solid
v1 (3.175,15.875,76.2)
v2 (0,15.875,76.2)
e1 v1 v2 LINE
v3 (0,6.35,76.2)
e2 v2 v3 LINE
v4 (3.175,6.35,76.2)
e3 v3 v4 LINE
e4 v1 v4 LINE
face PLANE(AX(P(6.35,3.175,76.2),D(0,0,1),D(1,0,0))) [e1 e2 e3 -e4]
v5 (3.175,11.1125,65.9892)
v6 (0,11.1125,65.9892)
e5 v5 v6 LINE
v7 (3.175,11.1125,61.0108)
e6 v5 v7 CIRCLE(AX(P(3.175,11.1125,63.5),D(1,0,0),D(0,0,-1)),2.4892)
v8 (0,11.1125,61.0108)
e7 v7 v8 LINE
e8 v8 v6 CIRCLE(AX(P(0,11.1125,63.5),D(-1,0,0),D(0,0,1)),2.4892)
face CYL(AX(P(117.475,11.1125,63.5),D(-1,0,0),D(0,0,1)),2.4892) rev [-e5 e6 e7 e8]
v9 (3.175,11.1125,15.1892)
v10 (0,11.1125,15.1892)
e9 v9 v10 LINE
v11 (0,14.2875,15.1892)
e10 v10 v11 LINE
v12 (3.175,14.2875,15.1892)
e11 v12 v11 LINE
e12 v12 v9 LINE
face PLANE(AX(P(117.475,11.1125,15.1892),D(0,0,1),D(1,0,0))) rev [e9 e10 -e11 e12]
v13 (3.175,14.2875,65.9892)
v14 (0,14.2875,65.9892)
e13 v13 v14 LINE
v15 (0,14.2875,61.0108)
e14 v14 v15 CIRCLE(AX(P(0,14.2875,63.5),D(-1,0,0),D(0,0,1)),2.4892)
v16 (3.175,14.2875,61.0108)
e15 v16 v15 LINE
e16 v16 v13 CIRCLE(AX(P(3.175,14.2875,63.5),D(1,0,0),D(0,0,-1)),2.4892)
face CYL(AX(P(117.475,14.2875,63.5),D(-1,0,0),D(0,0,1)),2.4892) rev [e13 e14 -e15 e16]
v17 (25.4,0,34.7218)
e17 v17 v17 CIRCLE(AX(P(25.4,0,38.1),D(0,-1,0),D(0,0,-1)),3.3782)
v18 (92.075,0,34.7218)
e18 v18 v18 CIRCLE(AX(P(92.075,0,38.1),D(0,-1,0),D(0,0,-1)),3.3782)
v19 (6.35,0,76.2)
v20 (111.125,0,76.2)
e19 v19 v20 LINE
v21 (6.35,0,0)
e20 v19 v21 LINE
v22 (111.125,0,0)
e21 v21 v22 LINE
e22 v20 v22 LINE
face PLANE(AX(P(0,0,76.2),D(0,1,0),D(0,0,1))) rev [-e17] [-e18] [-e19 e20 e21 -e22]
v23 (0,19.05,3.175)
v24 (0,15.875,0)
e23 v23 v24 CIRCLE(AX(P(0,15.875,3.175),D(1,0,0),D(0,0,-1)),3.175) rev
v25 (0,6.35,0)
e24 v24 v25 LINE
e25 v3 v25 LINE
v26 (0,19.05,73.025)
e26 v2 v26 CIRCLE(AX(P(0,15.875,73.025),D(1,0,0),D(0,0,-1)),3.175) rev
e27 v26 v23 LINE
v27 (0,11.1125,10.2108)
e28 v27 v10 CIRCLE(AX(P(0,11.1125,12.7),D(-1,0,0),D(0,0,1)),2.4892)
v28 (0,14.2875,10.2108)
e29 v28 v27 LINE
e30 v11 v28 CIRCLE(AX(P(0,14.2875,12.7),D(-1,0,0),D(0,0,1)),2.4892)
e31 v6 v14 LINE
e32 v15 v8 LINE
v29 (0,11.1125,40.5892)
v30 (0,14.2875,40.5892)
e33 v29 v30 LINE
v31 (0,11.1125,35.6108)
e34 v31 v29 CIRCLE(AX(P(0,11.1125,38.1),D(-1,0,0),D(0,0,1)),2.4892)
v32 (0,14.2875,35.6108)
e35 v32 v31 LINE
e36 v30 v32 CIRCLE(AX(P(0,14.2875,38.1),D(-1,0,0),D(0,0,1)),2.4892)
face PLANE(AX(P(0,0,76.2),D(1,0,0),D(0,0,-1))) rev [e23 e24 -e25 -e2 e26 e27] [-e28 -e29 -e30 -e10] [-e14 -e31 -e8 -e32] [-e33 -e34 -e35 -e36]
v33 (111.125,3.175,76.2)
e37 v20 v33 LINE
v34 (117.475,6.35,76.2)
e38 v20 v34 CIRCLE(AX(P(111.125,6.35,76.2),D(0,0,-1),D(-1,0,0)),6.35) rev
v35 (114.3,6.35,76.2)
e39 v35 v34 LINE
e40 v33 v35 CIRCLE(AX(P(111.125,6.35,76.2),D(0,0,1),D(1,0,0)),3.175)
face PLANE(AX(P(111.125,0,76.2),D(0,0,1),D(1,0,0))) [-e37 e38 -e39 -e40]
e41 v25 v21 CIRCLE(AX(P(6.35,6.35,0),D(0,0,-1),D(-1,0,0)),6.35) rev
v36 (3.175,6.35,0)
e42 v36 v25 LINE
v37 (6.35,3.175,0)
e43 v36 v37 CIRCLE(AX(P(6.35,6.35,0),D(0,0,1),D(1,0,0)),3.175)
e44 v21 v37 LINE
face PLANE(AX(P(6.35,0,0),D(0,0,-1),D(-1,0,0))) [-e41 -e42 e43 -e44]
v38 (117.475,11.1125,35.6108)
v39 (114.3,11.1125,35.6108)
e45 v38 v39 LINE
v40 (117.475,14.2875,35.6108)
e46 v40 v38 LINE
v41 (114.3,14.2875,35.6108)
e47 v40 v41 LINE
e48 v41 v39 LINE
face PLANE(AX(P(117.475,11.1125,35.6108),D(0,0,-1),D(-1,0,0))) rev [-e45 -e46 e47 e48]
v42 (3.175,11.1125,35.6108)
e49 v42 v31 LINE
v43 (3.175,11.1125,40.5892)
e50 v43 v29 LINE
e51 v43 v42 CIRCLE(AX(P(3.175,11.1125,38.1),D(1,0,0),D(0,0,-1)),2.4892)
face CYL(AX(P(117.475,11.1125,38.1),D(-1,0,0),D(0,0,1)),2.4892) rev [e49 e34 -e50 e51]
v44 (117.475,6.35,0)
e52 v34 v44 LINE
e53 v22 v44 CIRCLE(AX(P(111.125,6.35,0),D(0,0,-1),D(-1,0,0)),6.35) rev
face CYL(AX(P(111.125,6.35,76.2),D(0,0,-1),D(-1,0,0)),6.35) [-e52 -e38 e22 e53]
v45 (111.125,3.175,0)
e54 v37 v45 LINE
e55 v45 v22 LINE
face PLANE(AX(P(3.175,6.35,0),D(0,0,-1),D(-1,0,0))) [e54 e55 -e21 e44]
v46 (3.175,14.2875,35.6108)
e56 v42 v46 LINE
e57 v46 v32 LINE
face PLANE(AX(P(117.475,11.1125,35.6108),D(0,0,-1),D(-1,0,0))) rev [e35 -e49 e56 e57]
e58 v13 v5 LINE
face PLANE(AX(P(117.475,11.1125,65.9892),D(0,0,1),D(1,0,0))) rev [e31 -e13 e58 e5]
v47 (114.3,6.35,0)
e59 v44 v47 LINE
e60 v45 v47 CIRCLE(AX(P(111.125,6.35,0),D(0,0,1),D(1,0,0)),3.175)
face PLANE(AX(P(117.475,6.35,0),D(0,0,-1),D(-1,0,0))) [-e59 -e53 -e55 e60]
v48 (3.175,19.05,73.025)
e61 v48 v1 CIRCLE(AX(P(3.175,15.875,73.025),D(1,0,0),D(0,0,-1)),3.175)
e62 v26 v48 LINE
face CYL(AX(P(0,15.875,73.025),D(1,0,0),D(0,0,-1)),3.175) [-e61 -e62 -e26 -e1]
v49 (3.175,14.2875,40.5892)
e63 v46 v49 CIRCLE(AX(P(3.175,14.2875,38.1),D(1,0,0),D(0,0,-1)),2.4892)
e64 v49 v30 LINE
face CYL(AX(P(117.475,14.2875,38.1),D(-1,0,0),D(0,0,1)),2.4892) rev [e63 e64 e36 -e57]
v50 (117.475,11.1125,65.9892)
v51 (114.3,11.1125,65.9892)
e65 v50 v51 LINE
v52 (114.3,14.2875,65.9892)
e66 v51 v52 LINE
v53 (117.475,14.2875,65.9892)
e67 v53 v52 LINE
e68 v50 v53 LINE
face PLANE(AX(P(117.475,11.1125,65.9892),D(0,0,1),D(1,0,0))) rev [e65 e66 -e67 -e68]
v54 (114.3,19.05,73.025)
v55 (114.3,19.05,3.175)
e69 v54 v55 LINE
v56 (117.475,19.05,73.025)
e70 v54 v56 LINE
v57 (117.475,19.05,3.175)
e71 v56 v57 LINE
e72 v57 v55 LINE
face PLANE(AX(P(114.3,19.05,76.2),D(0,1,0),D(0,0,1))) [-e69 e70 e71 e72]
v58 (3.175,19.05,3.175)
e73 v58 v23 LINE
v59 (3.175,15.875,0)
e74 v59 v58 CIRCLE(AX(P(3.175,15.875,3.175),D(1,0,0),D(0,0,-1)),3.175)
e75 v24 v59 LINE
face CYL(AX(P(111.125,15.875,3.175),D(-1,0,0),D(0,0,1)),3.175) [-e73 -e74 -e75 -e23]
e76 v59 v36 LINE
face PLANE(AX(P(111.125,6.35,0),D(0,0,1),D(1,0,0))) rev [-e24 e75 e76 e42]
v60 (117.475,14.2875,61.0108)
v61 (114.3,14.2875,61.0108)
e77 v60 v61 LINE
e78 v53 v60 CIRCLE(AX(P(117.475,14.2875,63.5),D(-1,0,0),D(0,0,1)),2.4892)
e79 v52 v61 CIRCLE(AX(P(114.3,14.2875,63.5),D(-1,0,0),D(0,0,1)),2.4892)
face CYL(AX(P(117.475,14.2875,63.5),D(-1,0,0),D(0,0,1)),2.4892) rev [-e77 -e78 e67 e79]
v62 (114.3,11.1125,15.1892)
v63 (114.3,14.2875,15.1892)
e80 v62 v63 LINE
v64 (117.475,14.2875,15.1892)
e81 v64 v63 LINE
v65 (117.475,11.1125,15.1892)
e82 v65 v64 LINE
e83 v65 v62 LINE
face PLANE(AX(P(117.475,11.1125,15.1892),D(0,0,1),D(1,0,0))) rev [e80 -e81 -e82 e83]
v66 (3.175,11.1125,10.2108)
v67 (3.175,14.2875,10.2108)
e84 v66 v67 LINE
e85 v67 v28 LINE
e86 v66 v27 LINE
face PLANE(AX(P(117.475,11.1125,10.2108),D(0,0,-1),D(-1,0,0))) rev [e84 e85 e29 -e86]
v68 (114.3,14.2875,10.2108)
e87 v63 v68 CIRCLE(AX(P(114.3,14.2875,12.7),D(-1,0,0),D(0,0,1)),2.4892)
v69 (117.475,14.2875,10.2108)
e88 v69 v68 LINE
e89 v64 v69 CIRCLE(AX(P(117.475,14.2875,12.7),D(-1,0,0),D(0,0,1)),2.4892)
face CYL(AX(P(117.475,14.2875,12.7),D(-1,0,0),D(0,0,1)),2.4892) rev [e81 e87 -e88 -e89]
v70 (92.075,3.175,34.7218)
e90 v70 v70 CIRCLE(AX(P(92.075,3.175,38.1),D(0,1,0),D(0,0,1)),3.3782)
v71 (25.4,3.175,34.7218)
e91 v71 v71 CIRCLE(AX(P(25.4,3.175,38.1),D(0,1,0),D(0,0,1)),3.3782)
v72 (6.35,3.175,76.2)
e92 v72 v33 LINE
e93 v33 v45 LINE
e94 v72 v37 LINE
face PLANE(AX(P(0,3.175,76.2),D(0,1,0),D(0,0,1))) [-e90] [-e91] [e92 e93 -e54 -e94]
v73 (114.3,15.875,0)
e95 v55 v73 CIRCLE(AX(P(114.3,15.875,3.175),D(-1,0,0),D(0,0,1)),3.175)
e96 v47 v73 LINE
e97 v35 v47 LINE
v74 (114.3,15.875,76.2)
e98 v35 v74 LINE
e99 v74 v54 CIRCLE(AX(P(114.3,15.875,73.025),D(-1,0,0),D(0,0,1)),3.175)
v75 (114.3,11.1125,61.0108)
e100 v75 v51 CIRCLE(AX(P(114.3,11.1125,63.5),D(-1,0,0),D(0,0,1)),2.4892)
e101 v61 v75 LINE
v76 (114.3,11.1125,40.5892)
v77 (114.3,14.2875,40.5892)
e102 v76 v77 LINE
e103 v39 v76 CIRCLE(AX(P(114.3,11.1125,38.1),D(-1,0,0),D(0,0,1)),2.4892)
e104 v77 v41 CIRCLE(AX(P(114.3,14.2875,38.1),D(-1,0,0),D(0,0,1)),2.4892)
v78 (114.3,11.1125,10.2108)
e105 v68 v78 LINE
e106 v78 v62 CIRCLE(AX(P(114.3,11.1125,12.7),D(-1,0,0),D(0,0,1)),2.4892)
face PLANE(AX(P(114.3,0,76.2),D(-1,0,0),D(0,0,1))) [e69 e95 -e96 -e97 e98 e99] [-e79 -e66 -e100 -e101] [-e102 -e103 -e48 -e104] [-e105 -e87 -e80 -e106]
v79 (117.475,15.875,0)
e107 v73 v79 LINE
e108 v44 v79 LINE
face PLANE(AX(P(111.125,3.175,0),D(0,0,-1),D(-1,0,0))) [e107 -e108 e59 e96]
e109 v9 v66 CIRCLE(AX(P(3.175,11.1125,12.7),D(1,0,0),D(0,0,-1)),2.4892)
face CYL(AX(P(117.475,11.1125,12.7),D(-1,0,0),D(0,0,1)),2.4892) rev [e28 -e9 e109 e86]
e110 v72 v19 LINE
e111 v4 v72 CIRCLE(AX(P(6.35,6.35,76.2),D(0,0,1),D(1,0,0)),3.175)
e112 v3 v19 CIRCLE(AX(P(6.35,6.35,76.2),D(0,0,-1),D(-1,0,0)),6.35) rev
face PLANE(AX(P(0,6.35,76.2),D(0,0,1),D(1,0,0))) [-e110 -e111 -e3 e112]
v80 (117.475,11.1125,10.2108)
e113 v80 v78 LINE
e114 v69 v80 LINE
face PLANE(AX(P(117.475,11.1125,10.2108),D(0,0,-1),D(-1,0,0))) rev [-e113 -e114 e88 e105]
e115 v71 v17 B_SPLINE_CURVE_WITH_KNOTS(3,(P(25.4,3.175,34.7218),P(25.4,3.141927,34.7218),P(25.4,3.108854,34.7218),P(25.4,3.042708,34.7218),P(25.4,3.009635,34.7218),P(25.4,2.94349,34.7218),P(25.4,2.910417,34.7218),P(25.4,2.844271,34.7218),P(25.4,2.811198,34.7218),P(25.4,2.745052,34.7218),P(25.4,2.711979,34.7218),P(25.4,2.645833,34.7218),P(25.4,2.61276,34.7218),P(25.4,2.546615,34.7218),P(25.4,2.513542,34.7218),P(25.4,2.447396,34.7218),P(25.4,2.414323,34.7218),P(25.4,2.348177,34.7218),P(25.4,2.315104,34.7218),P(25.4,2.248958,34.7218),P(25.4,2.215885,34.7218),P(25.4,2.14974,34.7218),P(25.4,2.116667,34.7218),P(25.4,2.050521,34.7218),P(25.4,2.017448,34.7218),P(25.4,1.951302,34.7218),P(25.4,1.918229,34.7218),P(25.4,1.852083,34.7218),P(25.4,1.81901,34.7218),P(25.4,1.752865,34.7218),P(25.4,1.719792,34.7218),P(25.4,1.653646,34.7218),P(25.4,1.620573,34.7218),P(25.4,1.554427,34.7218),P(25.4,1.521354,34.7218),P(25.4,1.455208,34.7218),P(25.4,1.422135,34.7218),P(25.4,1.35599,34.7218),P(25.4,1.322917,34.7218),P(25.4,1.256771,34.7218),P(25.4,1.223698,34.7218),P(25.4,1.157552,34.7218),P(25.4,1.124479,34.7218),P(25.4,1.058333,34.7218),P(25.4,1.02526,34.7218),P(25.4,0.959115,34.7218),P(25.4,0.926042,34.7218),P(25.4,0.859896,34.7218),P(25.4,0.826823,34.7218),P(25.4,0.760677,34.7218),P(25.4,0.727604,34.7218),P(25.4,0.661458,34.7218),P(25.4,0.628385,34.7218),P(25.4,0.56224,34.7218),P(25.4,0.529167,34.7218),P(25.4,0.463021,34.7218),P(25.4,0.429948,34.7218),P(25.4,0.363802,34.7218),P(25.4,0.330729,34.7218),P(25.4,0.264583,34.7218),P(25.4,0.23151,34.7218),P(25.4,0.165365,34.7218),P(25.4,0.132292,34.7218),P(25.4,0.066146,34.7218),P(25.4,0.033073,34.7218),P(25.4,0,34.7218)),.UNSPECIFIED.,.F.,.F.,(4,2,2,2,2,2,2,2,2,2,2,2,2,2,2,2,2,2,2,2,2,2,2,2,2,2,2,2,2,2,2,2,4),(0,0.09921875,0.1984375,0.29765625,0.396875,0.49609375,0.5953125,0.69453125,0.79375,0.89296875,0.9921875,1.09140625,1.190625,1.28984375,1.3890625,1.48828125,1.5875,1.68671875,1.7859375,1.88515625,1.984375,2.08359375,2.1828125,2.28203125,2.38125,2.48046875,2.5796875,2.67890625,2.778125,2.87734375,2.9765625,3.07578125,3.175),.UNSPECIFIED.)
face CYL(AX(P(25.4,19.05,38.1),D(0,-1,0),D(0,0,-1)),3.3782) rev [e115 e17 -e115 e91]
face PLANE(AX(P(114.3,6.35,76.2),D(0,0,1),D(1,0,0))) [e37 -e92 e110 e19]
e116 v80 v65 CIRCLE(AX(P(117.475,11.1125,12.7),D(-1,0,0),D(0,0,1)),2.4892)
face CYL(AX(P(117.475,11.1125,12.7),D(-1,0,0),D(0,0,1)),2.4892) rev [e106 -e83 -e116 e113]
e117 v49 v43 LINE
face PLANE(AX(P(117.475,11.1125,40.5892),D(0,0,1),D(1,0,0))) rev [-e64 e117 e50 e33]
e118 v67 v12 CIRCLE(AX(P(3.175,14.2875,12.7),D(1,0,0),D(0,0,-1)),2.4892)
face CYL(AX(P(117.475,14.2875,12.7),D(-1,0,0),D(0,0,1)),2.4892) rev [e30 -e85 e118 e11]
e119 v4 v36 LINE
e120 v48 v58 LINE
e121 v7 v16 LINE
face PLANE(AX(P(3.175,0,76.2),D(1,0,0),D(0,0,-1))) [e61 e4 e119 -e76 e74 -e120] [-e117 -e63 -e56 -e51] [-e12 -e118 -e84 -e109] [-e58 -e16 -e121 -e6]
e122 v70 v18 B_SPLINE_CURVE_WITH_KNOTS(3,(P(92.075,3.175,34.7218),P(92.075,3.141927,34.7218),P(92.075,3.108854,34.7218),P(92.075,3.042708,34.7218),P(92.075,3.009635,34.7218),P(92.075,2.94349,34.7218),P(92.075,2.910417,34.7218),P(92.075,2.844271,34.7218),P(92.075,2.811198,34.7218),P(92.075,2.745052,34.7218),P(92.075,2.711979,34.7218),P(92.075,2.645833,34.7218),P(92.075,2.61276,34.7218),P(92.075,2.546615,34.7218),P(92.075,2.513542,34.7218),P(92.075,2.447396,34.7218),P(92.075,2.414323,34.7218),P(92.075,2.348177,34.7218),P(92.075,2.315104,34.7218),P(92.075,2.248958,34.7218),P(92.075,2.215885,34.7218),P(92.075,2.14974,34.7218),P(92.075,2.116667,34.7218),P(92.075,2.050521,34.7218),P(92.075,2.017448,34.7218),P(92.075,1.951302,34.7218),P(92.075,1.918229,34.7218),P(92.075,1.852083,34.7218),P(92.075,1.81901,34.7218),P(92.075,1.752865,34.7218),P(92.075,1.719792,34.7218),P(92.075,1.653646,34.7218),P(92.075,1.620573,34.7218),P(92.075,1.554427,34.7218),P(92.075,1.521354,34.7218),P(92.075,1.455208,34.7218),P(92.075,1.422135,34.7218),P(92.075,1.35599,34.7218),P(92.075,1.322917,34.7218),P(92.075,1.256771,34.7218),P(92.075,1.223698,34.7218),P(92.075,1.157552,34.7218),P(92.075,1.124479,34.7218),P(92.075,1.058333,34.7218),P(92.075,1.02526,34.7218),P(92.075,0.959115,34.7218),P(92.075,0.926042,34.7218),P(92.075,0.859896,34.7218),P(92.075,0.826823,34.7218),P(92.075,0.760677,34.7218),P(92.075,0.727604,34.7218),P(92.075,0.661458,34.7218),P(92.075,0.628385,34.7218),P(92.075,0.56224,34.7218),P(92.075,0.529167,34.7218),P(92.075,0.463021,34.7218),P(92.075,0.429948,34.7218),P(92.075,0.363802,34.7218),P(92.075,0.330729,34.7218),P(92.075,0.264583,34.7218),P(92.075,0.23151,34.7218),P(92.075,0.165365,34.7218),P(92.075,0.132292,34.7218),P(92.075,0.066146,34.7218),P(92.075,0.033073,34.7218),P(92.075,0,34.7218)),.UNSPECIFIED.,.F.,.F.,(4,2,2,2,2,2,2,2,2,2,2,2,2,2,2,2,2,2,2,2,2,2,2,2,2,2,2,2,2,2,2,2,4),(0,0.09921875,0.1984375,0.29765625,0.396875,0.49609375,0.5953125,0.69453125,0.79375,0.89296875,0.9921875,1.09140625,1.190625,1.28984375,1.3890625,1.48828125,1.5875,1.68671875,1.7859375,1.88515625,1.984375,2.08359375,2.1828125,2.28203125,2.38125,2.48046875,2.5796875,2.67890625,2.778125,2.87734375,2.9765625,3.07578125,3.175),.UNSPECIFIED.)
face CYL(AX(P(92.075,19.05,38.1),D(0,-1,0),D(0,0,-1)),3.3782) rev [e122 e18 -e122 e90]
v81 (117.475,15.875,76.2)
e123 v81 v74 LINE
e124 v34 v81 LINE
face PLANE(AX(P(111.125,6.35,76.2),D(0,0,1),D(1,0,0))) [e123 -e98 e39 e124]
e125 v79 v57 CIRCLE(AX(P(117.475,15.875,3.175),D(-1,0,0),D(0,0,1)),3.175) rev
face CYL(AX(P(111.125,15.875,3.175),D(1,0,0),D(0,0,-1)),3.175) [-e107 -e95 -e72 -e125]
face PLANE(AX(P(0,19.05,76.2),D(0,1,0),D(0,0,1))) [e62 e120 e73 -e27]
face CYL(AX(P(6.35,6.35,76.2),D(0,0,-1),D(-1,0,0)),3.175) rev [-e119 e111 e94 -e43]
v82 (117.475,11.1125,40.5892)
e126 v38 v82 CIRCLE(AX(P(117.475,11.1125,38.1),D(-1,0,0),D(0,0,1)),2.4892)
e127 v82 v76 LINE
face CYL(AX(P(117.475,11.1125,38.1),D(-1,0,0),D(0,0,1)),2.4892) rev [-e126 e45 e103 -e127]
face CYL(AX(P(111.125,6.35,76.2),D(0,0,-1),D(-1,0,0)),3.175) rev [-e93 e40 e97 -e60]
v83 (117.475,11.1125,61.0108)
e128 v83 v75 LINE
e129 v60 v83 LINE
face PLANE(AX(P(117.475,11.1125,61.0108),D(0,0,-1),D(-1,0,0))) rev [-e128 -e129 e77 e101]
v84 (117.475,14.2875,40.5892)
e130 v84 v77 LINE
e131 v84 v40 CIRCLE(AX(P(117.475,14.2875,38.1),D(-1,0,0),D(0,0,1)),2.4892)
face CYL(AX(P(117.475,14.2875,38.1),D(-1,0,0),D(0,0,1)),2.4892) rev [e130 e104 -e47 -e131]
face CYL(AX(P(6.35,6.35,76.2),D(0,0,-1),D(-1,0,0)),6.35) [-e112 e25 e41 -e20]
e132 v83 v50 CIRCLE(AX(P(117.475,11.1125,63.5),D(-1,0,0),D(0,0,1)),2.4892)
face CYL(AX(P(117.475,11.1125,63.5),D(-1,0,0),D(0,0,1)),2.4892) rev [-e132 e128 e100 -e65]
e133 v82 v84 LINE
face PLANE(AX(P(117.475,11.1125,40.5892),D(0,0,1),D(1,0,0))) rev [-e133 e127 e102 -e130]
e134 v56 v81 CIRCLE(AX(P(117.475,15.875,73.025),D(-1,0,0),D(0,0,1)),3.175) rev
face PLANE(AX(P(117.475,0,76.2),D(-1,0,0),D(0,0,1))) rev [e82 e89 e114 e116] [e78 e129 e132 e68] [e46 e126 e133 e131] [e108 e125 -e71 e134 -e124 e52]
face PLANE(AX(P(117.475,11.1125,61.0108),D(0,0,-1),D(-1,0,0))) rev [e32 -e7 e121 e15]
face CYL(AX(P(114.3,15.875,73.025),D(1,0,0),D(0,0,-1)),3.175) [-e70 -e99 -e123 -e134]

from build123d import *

# Parameters (mm, degrees)
BASE_FLANGE1_DEPTH = 76.2
CUT_EXTRUDE1_DEPTH = 142.314253085
SKETCH7_R          = 3.3782
CUT_EXTRUDE2_DEPTH = 142.314253085
FILLET1_R          = 3.175


# Sheet-metal steps are written as plain solids
with BuildPart() as part:
    # Sketch1 → Base-Flange1 (new body)
    with BuildSketch(Plane.XY):
        with BuildLine():
            Line((117.475, 19.05), (117.475, 6.35))
            ThreePointArc((117.475, 6.35), (115.615128061, 1.859871939), (111.125, 0))
            Line((111.125, 0), (6.35, 0))
            ThreePointArc((6.35, 0), (1.859871939, 1.859871939), (0, 6.35))
            Line((0, 6.35), (0, 19.05))
            Line((0, 19.05), (3.175, 19.05))
            Line((3.175, 19.05), (3.175, 6.35))
            ThreePointArc((3.175, 6.35), (4.10493597, 4.10493597), (6.35, 3.175))
            Line((6.35, 3.175), (111.125, 3.175))
            ThreePointArc((111.125, 3.175), (113.37006403, 4.10493597), (114.3, 6.35))
            Line((114.3, 6.35), (114.3, 19.05))
            Line((114.3, 19.05), (117.475, 19.05))
        make_face()
    extrude(amount=BASE_FLANGE1_DEPTH)

    # Sketch6 → Cut-Extrude1 (cut, through all)
    with BuildSketch(Plane.ZY):
        with BuildLine():
            Line((35.6108, 11.1125), (35.6108, 14.2875))
            ThreePointArc((35.6108, 14.2875), (38.1, 16.7767), (40.5892, 14.2875))
            Line((40.5892, 14.2875), (40.5892, 11.1125))
            ThreePointArc((40.5892, 11.1125), (38.1, 8.6233), (35.6108, 11.1125))
        make_face()
        with BuildLine():
            Line((10.2108, 11.1125), (10.2108, 14.2875))
            ThreePointArc((10.2108, 14.2875), (12.7, 16.7767), (15.1892, 14.2875))
            Line((15.1892, 14.2875), (15.1892, 11.1125))
            ThreePointArc((15.1892, 11.1125), (12.7, 8.6233), (10.2108, 11.1125))
        make_face()
        with BuildLine():
            Line((61.0108, 11.1125), (61.0108, 14.2875))
            ThreePointArc((61.0108, 14.2875), (63.5, 16.7767), (65.9892, 14.2875))
            Line((65.9892, 14.2875), (65.9892, 11.1125))
            ThreePointArc((65.9892, 11.1125), (63.5, 8.6233), (61.0108, 11.1125))
        make_face()
    extrude(amount=-CUT_EXTRUDE1_DEPTH, mode=Mode.SUBTRACT)

    # Sketch7 → Cut-Extrude2 (cut, through all)
    with BuildSketch(Plane.XZ):
        with Locations(Location((92.075, 38.1, 0), (0, 0, 270))):
            Circle(SKETCH7_R)
        with Locations(Location((25.4, 38.1, 0), (0, 0, 270))):
            Circle(SKETCH7_R)
    extrude(amount=-CUT_EXTRUDE2_DEPTH, mode=Mode.SUBTRACT)

    # Fillet1
    fillet1_edges = [part.edges().sort_by_distance(p)[0] for p in [
        (1.5875, 19.05, 0),
        (115.8875, 19.05, 0),
        (1.5875, 19.05, 76.2),
        (115.8875, 19.05, 76.2),
    ]]
    fillet(fillet1_edges, radius=FILLET1_R)


solid = part.part
